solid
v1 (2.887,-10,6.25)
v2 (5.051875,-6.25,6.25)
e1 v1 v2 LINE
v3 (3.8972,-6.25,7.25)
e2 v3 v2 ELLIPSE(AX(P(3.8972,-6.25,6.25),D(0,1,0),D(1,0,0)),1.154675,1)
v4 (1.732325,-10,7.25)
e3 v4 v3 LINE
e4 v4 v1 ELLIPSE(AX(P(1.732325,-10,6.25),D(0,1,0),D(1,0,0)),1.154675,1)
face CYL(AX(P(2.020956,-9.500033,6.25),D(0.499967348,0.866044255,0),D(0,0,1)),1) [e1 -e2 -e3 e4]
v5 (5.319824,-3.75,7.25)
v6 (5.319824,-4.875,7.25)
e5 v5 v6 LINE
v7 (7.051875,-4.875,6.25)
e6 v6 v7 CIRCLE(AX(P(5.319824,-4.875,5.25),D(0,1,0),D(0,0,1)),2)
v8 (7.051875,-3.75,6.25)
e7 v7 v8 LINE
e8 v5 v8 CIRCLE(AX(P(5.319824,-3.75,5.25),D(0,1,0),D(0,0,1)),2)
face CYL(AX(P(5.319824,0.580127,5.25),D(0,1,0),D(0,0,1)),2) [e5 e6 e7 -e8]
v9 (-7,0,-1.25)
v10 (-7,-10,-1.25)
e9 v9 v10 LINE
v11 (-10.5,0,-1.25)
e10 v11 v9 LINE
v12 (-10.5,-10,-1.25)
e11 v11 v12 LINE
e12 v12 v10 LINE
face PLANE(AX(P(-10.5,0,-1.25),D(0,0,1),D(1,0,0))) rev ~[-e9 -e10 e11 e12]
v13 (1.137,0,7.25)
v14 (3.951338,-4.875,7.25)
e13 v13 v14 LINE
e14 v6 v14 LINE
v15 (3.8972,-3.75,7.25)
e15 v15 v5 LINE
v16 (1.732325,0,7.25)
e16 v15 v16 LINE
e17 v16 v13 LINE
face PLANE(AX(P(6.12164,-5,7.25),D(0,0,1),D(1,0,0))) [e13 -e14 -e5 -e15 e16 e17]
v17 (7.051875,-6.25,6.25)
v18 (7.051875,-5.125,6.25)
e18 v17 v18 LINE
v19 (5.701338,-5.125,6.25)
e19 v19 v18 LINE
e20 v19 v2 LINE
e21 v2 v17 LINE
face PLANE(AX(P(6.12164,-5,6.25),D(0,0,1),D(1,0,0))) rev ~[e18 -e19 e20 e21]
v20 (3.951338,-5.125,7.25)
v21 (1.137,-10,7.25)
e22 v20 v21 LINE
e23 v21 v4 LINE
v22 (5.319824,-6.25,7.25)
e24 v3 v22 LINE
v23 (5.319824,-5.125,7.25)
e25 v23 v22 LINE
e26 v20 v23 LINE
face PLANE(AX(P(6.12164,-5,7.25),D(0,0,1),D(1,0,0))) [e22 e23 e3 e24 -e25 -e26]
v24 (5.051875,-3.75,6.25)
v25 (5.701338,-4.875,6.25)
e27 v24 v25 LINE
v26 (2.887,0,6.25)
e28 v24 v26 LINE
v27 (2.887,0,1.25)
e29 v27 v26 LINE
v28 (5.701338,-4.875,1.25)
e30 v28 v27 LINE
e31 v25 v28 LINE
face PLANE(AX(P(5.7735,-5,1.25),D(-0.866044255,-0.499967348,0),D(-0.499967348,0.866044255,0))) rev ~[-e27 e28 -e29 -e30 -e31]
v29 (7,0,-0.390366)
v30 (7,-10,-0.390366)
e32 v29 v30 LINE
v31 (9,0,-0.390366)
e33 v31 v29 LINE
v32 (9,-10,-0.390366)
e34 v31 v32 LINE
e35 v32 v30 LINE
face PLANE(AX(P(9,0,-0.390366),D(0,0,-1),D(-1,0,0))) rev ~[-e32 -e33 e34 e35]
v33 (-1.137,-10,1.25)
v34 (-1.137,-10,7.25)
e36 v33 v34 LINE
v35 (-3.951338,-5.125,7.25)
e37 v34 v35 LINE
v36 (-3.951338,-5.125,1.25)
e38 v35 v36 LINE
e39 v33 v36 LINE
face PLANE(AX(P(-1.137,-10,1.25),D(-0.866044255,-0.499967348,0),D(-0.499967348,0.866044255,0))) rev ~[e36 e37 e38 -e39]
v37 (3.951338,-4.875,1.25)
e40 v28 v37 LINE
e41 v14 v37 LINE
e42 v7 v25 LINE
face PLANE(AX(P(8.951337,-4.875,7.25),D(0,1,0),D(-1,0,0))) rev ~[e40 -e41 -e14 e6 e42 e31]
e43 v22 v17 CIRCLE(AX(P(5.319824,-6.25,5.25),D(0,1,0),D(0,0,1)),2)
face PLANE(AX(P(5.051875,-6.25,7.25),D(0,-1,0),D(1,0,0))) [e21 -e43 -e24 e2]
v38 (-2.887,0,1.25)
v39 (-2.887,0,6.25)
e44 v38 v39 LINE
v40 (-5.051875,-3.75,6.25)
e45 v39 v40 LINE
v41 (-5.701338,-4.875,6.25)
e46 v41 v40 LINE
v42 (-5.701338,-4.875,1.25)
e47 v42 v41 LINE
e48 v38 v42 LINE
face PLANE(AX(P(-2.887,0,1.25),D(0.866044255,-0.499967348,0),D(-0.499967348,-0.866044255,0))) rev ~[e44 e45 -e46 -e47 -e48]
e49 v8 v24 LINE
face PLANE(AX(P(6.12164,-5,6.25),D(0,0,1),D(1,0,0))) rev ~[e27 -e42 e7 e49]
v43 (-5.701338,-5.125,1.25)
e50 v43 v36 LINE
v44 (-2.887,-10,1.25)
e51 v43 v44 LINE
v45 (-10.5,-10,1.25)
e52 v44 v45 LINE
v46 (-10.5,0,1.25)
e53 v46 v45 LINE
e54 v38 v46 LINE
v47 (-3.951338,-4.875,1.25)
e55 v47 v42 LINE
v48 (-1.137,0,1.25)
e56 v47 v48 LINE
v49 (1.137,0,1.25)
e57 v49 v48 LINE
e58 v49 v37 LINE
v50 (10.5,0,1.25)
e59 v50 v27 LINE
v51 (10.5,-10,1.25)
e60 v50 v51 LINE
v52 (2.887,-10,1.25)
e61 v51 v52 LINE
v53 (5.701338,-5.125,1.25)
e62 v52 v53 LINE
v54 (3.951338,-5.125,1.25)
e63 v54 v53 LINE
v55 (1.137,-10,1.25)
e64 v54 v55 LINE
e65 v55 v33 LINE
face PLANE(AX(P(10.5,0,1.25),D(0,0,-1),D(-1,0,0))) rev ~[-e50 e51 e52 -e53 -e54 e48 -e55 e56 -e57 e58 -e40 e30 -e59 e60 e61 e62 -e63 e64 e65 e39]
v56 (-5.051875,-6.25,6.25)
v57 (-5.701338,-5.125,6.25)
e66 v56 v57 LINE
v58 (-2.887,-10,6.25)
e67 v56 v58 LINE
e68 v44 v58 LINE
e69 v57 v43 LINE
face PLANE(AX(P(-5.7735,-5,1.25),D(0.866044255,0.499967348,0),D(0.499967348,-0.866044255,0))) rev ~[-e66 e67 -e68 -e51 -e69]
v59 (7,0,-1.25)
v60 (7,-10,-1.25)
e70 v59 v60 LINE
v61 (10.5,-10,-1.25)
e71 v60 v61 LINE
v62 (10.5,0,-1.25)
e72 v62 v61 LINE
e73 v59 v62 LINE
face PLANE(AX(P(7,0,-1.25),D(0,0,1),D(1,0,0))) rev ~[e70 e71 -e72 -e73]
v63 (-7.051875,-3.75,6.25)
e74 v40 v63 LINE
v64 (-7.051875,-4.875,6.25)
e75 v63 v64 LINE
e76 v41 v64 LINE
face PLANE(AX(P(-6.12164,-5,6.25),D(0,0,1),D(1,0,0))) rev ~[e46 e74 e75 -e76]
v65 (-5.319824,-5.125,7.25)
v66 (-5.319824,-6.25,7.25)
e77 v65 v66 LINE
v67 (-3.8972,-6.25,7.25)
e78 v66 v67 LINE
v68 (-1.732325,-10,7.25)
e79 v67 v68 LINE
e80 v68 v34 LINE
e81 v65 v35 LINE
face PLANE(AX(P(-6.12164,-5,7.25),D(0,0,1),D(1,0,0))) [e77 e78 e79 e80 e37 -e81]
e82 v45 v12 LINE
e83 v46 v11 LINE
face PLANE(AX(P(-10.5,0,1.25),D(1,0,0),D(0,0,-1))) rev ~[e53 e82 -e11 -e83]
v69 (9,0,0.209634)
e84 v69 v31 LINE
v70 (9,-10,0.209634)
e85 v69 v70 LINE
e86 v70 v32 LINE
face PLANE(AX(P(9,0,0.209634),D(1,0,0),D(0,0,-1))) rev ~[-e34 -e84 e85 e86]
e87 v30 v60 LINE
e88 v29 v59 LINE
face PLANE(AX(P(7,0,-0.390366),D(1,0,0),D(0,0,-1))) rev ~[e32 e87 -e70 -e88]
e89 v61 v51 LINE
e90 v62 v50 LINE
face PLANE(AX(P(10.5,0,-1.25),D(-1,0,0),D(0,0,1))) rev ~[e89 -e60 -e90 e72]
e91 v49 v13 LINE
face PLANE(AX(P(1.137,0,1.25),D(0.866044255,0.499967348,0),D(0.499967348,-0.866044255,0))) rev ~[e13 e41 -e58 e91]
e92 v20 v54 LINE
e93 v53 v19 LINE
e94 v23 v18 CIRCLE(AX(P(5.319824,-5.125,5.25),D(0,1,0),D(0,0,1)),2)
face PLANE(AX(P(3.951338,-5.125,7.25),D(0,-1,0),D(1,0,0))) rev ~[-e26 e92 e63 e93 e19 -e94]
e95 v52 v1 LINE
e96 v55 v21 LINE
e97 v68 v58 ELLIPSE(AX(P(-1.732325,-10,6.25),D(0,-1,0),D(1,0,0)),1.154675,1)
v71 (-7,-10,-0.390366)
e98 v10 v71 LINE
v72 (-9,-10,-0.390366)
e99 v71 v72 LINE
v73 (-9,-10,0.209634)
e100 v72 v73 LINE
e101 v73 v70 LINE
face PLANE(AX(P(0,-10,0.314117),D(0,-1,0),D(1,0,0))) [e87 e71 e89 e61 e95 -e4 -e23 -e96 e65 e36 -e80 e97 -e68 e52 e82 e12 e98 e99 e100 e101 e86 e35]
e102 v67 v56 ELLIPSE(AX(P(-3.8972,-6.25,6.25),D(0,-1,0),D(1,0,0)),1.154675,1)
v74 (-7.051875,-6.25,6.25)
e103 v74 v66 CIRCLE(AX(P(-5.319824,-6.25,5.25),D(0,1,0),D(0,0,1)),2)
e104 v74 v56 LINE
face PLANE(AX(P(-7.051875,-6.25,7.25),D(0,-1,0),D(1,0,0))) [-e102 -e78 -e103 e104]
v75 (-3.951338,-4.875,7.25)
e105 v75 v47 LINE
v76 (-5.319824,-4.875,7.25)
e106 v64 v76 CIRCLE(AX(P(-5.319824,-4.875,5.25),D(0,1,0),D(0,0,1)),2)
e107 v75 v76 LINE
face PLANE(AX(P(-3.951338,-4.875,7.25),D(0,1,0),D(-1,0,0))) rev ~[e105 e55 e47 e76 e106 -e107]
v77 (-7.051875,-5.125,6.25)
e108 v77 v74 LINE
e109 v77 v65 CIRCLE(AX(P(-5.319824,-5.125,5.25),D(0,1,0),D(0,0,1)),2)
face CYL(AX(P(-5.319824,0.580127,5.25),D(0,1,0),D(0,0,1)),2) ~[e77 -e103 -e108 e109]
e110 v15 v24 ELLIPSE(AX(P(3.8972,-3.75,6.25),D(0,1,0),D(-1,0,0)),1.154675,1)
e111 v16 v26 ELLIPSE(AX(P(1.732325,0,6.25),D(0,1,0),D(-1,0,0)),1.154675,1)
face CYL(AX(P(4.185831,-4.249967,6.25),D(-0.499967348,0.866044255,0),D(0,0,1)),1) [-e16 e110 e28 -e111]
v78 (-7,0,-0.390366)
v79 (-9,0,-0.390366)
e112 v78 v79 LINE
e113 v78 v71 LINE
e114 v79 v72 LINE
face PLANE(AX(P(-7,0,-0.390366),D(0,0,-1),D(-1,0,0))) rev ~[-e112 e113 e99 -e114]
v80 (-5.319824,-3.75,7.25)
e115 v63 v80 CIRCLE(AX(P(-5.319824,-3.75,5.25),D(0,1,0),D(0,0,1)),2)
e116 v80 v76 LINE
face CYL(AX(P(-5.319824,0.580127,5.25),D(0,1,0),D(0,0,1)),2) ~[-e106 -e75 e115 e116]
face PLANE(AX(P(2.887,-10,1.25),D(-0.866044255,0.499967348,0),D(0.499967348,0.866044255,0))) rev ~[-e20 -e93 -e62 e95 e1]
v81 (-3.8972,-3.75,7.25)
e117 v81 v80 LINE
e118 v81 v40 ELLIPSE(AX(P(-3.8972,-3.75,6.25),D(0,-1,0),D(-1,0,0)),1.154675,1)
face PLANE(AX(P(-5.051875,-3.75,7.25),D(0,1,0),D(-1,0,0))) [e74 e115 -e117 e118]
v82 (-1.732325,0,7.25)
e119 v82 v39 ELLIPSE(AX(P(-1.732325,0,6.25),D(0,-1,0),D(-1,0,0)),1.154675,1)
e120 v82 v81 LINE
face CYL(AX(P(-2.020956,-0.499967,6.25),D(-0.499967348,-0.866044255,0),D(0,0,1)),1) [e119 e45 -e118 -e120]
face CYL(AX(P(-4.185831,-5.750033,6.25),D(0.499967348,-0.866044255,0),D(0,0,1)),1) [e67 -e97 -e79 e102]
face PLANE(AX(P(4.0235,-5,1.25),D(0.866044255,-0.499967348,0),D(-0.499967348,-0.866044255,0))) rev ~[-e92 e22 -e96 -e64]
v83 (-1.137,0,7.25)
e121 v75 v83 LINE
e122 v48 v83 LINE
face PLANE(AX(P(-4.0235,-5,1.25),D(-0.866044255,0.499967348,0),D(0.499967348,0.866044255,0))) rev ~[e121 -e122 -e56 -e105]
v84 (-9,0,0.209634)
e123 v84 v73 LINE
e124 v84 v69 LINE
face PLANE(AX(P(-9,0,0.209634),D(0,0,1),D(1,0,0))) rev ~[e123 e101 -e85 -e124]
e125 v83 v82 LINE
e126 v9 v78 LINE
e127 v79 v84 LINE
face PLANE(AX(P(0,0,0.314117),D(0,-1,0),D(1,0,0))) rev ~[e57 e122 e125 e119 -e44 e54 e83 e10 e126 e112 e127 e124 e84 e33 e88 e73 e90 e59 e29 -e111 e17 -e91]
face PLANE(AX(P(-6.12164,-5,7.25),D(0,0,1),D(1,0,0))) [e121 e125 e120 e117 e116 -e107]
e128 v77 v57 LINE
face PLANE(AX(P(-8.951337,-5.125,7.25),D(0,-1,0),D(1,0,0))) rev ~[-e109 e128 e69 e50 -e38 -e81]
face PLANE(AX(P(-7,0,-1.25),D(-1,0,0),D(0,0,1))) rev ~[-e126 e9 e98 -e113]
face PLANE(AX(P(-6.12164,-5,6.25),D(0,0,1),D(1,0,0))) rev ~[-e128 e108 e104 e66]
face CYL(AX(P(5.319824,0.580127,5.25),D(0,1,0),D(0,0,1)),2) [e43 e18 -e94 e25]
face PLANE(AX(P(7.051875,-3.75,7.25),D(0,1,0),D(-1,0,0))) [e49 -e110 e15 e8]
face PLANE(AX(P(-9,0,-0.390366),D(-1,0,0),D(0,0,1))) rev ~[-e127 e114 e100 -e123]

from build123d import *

# Parameters (mm, degrees)
F1_DEPTH    = 10
F3_DEPTH    = 6
F6_DEPTH    = 1
F7_DEPTH    = 1
F8_T1_DEPTH = 11.1602540378
F9_R        = 1
F10_W       = 3.6315133076
F10_H       = 0.25
F11_DEPTH   = 6
F12_W       = 3.6315133076
F12_H       = 0.25
F13_DEPTH   = 6


# Not quite as in the source:
# - a fillet or chamfer that OpenCascade refuses, or shapes differently, is made with other operations: its cross-section is extruded or revolved along the edge and cut away or added


with BuildPart() as f1:
    # F0 (on Front) → F1 (new body)
    with BuildSketch(Plane.XZ):
        Polygon((7, -1.25), (10.5, -1.25), (10.5, 1.25), (-10.5, 1.25), (-10.5, -1.25), (-7, -1.25), (-7, -0.3903658071), (-9, -0.3903658071), (-9, 0.2096341929), (9, 0.2096341929), (9, -0.3903658071), (7, -0.3903658071), align=None)
    extrude(amount=F1_DEPTH)

    # F2 (on face) → F3 (join)
    with BuildSketch(Plane.XY.offset(1.25)):
        Polygon((-1.137, -10), (-4.0235, -5), (-5.7735, -5), (-2.887, -10), align=None)
        Polygon((-4.0235, -5), (-1.137, 0), (-2.887, 0), (-5.7735, -5), align=None)
        Polygon((2.887, 0), (1.137, 0), (4.0235, -5), (5.7735, -5), align=None)
        Polygon((5.7735, -5), (4.0235, -5), (1.137, -10), (2.887, -10), align=None)
    extrude(amount=F3_DEPTH)

    # F4 (on face) → F6 (join)
    with BuildSketch(Plane.XY.offset(7.25)):
        Polygon((-5.7735, -5), (-5.051875, -3.75), (-7.051875, -3.75), (-7.051875, -6.25), (-5.051875, -6.25), align=None)
    extrude(amount=-F6_DEPTH)

    # F5 (on face) → F7 (join)
    with BuildSketch(Plane.XY.offset(7.25)):
        Polygon((7.051875, -3.75), (5.051875, -3.75), (5.7735, -5), (5.051875, -6.25), (7.051875, -6.25), align=None)
    extrude(amount=-F7_DEPTH)

    # F8: fillet of radius 2 on 2 edges, made by hand

    # F8_s2 → F8_t1 (cut)
    with BuildSketch(Plane.XZ.offset(-0.5801270189)):
        with BuildLine():
            ThreePointArc((-5.3198241924, 7.25), (-6.3198241924, 6.9820508076), (-7.051875, 6.25))
            Line((-7.051875, 6.25), (-7.051875, 7.25))
            Line((-7.051875, 7.25), (-5.3198241924, 7.25))
        make_face()
        with BuildLine():
            ThreePointArc((5.3198241924, 7.25), (6.3198241924, 6.9820508076), (7.051875, 6.25))
            Line((7.051875, 6.25), (7.051875, 7.25))
            Line((7.051875, 7.25), (5.3198241924, 7.25))
        make_face()
    extrude(amount=F8_T1_DEPTH, mode=Mode.SUBTRACT)

    # F9
    f9_edges = [f1.edges().sort_by_distance(p)[0] for p in [
        (-3.969438, -8.125, 7.25),
        (-3.969438, -1.875, 7.25),
        (3.969437, -8.125, 7.25),
        (3.969437, -1.875, 7.25),
    ]]
    fillet(f9_edges, radius=F9_R)

    # F10 (on face) → F11 (cut)
    with BuildSketch(Plane.XY.offset(7.25)):
        Polygon((-4.0235, -5), (-3.9513375, -4.875), (-5.3198241924, -4.875), (-5.3198241924, -5.125), (-3.9513375, -5.125), align=None)
        with Locations((-7.1355808462, -5)):
            Rectangle(F10_W, F10_H)
    extrude(amount=-F11_DEPTH, mode=Mode.SUBTRACT)

    # F12 (on face) → F13 (cut)
    with BuildSketch(Plane.XY.offset(7.25)):
        with Locations((7.1355808462, -5)):
            Rectangle(F12_W, F12_H)
        Polygon((5.3198241924, -4.875), (3.9513375, -4.875), (4.0235, -5), (3.9513375, -5.125), (5.3198241924, -5.125), align=None)
    extrude(amount=-F13_DEPTH, mode=Mode.SUBTRACT)


solid = f1.part
